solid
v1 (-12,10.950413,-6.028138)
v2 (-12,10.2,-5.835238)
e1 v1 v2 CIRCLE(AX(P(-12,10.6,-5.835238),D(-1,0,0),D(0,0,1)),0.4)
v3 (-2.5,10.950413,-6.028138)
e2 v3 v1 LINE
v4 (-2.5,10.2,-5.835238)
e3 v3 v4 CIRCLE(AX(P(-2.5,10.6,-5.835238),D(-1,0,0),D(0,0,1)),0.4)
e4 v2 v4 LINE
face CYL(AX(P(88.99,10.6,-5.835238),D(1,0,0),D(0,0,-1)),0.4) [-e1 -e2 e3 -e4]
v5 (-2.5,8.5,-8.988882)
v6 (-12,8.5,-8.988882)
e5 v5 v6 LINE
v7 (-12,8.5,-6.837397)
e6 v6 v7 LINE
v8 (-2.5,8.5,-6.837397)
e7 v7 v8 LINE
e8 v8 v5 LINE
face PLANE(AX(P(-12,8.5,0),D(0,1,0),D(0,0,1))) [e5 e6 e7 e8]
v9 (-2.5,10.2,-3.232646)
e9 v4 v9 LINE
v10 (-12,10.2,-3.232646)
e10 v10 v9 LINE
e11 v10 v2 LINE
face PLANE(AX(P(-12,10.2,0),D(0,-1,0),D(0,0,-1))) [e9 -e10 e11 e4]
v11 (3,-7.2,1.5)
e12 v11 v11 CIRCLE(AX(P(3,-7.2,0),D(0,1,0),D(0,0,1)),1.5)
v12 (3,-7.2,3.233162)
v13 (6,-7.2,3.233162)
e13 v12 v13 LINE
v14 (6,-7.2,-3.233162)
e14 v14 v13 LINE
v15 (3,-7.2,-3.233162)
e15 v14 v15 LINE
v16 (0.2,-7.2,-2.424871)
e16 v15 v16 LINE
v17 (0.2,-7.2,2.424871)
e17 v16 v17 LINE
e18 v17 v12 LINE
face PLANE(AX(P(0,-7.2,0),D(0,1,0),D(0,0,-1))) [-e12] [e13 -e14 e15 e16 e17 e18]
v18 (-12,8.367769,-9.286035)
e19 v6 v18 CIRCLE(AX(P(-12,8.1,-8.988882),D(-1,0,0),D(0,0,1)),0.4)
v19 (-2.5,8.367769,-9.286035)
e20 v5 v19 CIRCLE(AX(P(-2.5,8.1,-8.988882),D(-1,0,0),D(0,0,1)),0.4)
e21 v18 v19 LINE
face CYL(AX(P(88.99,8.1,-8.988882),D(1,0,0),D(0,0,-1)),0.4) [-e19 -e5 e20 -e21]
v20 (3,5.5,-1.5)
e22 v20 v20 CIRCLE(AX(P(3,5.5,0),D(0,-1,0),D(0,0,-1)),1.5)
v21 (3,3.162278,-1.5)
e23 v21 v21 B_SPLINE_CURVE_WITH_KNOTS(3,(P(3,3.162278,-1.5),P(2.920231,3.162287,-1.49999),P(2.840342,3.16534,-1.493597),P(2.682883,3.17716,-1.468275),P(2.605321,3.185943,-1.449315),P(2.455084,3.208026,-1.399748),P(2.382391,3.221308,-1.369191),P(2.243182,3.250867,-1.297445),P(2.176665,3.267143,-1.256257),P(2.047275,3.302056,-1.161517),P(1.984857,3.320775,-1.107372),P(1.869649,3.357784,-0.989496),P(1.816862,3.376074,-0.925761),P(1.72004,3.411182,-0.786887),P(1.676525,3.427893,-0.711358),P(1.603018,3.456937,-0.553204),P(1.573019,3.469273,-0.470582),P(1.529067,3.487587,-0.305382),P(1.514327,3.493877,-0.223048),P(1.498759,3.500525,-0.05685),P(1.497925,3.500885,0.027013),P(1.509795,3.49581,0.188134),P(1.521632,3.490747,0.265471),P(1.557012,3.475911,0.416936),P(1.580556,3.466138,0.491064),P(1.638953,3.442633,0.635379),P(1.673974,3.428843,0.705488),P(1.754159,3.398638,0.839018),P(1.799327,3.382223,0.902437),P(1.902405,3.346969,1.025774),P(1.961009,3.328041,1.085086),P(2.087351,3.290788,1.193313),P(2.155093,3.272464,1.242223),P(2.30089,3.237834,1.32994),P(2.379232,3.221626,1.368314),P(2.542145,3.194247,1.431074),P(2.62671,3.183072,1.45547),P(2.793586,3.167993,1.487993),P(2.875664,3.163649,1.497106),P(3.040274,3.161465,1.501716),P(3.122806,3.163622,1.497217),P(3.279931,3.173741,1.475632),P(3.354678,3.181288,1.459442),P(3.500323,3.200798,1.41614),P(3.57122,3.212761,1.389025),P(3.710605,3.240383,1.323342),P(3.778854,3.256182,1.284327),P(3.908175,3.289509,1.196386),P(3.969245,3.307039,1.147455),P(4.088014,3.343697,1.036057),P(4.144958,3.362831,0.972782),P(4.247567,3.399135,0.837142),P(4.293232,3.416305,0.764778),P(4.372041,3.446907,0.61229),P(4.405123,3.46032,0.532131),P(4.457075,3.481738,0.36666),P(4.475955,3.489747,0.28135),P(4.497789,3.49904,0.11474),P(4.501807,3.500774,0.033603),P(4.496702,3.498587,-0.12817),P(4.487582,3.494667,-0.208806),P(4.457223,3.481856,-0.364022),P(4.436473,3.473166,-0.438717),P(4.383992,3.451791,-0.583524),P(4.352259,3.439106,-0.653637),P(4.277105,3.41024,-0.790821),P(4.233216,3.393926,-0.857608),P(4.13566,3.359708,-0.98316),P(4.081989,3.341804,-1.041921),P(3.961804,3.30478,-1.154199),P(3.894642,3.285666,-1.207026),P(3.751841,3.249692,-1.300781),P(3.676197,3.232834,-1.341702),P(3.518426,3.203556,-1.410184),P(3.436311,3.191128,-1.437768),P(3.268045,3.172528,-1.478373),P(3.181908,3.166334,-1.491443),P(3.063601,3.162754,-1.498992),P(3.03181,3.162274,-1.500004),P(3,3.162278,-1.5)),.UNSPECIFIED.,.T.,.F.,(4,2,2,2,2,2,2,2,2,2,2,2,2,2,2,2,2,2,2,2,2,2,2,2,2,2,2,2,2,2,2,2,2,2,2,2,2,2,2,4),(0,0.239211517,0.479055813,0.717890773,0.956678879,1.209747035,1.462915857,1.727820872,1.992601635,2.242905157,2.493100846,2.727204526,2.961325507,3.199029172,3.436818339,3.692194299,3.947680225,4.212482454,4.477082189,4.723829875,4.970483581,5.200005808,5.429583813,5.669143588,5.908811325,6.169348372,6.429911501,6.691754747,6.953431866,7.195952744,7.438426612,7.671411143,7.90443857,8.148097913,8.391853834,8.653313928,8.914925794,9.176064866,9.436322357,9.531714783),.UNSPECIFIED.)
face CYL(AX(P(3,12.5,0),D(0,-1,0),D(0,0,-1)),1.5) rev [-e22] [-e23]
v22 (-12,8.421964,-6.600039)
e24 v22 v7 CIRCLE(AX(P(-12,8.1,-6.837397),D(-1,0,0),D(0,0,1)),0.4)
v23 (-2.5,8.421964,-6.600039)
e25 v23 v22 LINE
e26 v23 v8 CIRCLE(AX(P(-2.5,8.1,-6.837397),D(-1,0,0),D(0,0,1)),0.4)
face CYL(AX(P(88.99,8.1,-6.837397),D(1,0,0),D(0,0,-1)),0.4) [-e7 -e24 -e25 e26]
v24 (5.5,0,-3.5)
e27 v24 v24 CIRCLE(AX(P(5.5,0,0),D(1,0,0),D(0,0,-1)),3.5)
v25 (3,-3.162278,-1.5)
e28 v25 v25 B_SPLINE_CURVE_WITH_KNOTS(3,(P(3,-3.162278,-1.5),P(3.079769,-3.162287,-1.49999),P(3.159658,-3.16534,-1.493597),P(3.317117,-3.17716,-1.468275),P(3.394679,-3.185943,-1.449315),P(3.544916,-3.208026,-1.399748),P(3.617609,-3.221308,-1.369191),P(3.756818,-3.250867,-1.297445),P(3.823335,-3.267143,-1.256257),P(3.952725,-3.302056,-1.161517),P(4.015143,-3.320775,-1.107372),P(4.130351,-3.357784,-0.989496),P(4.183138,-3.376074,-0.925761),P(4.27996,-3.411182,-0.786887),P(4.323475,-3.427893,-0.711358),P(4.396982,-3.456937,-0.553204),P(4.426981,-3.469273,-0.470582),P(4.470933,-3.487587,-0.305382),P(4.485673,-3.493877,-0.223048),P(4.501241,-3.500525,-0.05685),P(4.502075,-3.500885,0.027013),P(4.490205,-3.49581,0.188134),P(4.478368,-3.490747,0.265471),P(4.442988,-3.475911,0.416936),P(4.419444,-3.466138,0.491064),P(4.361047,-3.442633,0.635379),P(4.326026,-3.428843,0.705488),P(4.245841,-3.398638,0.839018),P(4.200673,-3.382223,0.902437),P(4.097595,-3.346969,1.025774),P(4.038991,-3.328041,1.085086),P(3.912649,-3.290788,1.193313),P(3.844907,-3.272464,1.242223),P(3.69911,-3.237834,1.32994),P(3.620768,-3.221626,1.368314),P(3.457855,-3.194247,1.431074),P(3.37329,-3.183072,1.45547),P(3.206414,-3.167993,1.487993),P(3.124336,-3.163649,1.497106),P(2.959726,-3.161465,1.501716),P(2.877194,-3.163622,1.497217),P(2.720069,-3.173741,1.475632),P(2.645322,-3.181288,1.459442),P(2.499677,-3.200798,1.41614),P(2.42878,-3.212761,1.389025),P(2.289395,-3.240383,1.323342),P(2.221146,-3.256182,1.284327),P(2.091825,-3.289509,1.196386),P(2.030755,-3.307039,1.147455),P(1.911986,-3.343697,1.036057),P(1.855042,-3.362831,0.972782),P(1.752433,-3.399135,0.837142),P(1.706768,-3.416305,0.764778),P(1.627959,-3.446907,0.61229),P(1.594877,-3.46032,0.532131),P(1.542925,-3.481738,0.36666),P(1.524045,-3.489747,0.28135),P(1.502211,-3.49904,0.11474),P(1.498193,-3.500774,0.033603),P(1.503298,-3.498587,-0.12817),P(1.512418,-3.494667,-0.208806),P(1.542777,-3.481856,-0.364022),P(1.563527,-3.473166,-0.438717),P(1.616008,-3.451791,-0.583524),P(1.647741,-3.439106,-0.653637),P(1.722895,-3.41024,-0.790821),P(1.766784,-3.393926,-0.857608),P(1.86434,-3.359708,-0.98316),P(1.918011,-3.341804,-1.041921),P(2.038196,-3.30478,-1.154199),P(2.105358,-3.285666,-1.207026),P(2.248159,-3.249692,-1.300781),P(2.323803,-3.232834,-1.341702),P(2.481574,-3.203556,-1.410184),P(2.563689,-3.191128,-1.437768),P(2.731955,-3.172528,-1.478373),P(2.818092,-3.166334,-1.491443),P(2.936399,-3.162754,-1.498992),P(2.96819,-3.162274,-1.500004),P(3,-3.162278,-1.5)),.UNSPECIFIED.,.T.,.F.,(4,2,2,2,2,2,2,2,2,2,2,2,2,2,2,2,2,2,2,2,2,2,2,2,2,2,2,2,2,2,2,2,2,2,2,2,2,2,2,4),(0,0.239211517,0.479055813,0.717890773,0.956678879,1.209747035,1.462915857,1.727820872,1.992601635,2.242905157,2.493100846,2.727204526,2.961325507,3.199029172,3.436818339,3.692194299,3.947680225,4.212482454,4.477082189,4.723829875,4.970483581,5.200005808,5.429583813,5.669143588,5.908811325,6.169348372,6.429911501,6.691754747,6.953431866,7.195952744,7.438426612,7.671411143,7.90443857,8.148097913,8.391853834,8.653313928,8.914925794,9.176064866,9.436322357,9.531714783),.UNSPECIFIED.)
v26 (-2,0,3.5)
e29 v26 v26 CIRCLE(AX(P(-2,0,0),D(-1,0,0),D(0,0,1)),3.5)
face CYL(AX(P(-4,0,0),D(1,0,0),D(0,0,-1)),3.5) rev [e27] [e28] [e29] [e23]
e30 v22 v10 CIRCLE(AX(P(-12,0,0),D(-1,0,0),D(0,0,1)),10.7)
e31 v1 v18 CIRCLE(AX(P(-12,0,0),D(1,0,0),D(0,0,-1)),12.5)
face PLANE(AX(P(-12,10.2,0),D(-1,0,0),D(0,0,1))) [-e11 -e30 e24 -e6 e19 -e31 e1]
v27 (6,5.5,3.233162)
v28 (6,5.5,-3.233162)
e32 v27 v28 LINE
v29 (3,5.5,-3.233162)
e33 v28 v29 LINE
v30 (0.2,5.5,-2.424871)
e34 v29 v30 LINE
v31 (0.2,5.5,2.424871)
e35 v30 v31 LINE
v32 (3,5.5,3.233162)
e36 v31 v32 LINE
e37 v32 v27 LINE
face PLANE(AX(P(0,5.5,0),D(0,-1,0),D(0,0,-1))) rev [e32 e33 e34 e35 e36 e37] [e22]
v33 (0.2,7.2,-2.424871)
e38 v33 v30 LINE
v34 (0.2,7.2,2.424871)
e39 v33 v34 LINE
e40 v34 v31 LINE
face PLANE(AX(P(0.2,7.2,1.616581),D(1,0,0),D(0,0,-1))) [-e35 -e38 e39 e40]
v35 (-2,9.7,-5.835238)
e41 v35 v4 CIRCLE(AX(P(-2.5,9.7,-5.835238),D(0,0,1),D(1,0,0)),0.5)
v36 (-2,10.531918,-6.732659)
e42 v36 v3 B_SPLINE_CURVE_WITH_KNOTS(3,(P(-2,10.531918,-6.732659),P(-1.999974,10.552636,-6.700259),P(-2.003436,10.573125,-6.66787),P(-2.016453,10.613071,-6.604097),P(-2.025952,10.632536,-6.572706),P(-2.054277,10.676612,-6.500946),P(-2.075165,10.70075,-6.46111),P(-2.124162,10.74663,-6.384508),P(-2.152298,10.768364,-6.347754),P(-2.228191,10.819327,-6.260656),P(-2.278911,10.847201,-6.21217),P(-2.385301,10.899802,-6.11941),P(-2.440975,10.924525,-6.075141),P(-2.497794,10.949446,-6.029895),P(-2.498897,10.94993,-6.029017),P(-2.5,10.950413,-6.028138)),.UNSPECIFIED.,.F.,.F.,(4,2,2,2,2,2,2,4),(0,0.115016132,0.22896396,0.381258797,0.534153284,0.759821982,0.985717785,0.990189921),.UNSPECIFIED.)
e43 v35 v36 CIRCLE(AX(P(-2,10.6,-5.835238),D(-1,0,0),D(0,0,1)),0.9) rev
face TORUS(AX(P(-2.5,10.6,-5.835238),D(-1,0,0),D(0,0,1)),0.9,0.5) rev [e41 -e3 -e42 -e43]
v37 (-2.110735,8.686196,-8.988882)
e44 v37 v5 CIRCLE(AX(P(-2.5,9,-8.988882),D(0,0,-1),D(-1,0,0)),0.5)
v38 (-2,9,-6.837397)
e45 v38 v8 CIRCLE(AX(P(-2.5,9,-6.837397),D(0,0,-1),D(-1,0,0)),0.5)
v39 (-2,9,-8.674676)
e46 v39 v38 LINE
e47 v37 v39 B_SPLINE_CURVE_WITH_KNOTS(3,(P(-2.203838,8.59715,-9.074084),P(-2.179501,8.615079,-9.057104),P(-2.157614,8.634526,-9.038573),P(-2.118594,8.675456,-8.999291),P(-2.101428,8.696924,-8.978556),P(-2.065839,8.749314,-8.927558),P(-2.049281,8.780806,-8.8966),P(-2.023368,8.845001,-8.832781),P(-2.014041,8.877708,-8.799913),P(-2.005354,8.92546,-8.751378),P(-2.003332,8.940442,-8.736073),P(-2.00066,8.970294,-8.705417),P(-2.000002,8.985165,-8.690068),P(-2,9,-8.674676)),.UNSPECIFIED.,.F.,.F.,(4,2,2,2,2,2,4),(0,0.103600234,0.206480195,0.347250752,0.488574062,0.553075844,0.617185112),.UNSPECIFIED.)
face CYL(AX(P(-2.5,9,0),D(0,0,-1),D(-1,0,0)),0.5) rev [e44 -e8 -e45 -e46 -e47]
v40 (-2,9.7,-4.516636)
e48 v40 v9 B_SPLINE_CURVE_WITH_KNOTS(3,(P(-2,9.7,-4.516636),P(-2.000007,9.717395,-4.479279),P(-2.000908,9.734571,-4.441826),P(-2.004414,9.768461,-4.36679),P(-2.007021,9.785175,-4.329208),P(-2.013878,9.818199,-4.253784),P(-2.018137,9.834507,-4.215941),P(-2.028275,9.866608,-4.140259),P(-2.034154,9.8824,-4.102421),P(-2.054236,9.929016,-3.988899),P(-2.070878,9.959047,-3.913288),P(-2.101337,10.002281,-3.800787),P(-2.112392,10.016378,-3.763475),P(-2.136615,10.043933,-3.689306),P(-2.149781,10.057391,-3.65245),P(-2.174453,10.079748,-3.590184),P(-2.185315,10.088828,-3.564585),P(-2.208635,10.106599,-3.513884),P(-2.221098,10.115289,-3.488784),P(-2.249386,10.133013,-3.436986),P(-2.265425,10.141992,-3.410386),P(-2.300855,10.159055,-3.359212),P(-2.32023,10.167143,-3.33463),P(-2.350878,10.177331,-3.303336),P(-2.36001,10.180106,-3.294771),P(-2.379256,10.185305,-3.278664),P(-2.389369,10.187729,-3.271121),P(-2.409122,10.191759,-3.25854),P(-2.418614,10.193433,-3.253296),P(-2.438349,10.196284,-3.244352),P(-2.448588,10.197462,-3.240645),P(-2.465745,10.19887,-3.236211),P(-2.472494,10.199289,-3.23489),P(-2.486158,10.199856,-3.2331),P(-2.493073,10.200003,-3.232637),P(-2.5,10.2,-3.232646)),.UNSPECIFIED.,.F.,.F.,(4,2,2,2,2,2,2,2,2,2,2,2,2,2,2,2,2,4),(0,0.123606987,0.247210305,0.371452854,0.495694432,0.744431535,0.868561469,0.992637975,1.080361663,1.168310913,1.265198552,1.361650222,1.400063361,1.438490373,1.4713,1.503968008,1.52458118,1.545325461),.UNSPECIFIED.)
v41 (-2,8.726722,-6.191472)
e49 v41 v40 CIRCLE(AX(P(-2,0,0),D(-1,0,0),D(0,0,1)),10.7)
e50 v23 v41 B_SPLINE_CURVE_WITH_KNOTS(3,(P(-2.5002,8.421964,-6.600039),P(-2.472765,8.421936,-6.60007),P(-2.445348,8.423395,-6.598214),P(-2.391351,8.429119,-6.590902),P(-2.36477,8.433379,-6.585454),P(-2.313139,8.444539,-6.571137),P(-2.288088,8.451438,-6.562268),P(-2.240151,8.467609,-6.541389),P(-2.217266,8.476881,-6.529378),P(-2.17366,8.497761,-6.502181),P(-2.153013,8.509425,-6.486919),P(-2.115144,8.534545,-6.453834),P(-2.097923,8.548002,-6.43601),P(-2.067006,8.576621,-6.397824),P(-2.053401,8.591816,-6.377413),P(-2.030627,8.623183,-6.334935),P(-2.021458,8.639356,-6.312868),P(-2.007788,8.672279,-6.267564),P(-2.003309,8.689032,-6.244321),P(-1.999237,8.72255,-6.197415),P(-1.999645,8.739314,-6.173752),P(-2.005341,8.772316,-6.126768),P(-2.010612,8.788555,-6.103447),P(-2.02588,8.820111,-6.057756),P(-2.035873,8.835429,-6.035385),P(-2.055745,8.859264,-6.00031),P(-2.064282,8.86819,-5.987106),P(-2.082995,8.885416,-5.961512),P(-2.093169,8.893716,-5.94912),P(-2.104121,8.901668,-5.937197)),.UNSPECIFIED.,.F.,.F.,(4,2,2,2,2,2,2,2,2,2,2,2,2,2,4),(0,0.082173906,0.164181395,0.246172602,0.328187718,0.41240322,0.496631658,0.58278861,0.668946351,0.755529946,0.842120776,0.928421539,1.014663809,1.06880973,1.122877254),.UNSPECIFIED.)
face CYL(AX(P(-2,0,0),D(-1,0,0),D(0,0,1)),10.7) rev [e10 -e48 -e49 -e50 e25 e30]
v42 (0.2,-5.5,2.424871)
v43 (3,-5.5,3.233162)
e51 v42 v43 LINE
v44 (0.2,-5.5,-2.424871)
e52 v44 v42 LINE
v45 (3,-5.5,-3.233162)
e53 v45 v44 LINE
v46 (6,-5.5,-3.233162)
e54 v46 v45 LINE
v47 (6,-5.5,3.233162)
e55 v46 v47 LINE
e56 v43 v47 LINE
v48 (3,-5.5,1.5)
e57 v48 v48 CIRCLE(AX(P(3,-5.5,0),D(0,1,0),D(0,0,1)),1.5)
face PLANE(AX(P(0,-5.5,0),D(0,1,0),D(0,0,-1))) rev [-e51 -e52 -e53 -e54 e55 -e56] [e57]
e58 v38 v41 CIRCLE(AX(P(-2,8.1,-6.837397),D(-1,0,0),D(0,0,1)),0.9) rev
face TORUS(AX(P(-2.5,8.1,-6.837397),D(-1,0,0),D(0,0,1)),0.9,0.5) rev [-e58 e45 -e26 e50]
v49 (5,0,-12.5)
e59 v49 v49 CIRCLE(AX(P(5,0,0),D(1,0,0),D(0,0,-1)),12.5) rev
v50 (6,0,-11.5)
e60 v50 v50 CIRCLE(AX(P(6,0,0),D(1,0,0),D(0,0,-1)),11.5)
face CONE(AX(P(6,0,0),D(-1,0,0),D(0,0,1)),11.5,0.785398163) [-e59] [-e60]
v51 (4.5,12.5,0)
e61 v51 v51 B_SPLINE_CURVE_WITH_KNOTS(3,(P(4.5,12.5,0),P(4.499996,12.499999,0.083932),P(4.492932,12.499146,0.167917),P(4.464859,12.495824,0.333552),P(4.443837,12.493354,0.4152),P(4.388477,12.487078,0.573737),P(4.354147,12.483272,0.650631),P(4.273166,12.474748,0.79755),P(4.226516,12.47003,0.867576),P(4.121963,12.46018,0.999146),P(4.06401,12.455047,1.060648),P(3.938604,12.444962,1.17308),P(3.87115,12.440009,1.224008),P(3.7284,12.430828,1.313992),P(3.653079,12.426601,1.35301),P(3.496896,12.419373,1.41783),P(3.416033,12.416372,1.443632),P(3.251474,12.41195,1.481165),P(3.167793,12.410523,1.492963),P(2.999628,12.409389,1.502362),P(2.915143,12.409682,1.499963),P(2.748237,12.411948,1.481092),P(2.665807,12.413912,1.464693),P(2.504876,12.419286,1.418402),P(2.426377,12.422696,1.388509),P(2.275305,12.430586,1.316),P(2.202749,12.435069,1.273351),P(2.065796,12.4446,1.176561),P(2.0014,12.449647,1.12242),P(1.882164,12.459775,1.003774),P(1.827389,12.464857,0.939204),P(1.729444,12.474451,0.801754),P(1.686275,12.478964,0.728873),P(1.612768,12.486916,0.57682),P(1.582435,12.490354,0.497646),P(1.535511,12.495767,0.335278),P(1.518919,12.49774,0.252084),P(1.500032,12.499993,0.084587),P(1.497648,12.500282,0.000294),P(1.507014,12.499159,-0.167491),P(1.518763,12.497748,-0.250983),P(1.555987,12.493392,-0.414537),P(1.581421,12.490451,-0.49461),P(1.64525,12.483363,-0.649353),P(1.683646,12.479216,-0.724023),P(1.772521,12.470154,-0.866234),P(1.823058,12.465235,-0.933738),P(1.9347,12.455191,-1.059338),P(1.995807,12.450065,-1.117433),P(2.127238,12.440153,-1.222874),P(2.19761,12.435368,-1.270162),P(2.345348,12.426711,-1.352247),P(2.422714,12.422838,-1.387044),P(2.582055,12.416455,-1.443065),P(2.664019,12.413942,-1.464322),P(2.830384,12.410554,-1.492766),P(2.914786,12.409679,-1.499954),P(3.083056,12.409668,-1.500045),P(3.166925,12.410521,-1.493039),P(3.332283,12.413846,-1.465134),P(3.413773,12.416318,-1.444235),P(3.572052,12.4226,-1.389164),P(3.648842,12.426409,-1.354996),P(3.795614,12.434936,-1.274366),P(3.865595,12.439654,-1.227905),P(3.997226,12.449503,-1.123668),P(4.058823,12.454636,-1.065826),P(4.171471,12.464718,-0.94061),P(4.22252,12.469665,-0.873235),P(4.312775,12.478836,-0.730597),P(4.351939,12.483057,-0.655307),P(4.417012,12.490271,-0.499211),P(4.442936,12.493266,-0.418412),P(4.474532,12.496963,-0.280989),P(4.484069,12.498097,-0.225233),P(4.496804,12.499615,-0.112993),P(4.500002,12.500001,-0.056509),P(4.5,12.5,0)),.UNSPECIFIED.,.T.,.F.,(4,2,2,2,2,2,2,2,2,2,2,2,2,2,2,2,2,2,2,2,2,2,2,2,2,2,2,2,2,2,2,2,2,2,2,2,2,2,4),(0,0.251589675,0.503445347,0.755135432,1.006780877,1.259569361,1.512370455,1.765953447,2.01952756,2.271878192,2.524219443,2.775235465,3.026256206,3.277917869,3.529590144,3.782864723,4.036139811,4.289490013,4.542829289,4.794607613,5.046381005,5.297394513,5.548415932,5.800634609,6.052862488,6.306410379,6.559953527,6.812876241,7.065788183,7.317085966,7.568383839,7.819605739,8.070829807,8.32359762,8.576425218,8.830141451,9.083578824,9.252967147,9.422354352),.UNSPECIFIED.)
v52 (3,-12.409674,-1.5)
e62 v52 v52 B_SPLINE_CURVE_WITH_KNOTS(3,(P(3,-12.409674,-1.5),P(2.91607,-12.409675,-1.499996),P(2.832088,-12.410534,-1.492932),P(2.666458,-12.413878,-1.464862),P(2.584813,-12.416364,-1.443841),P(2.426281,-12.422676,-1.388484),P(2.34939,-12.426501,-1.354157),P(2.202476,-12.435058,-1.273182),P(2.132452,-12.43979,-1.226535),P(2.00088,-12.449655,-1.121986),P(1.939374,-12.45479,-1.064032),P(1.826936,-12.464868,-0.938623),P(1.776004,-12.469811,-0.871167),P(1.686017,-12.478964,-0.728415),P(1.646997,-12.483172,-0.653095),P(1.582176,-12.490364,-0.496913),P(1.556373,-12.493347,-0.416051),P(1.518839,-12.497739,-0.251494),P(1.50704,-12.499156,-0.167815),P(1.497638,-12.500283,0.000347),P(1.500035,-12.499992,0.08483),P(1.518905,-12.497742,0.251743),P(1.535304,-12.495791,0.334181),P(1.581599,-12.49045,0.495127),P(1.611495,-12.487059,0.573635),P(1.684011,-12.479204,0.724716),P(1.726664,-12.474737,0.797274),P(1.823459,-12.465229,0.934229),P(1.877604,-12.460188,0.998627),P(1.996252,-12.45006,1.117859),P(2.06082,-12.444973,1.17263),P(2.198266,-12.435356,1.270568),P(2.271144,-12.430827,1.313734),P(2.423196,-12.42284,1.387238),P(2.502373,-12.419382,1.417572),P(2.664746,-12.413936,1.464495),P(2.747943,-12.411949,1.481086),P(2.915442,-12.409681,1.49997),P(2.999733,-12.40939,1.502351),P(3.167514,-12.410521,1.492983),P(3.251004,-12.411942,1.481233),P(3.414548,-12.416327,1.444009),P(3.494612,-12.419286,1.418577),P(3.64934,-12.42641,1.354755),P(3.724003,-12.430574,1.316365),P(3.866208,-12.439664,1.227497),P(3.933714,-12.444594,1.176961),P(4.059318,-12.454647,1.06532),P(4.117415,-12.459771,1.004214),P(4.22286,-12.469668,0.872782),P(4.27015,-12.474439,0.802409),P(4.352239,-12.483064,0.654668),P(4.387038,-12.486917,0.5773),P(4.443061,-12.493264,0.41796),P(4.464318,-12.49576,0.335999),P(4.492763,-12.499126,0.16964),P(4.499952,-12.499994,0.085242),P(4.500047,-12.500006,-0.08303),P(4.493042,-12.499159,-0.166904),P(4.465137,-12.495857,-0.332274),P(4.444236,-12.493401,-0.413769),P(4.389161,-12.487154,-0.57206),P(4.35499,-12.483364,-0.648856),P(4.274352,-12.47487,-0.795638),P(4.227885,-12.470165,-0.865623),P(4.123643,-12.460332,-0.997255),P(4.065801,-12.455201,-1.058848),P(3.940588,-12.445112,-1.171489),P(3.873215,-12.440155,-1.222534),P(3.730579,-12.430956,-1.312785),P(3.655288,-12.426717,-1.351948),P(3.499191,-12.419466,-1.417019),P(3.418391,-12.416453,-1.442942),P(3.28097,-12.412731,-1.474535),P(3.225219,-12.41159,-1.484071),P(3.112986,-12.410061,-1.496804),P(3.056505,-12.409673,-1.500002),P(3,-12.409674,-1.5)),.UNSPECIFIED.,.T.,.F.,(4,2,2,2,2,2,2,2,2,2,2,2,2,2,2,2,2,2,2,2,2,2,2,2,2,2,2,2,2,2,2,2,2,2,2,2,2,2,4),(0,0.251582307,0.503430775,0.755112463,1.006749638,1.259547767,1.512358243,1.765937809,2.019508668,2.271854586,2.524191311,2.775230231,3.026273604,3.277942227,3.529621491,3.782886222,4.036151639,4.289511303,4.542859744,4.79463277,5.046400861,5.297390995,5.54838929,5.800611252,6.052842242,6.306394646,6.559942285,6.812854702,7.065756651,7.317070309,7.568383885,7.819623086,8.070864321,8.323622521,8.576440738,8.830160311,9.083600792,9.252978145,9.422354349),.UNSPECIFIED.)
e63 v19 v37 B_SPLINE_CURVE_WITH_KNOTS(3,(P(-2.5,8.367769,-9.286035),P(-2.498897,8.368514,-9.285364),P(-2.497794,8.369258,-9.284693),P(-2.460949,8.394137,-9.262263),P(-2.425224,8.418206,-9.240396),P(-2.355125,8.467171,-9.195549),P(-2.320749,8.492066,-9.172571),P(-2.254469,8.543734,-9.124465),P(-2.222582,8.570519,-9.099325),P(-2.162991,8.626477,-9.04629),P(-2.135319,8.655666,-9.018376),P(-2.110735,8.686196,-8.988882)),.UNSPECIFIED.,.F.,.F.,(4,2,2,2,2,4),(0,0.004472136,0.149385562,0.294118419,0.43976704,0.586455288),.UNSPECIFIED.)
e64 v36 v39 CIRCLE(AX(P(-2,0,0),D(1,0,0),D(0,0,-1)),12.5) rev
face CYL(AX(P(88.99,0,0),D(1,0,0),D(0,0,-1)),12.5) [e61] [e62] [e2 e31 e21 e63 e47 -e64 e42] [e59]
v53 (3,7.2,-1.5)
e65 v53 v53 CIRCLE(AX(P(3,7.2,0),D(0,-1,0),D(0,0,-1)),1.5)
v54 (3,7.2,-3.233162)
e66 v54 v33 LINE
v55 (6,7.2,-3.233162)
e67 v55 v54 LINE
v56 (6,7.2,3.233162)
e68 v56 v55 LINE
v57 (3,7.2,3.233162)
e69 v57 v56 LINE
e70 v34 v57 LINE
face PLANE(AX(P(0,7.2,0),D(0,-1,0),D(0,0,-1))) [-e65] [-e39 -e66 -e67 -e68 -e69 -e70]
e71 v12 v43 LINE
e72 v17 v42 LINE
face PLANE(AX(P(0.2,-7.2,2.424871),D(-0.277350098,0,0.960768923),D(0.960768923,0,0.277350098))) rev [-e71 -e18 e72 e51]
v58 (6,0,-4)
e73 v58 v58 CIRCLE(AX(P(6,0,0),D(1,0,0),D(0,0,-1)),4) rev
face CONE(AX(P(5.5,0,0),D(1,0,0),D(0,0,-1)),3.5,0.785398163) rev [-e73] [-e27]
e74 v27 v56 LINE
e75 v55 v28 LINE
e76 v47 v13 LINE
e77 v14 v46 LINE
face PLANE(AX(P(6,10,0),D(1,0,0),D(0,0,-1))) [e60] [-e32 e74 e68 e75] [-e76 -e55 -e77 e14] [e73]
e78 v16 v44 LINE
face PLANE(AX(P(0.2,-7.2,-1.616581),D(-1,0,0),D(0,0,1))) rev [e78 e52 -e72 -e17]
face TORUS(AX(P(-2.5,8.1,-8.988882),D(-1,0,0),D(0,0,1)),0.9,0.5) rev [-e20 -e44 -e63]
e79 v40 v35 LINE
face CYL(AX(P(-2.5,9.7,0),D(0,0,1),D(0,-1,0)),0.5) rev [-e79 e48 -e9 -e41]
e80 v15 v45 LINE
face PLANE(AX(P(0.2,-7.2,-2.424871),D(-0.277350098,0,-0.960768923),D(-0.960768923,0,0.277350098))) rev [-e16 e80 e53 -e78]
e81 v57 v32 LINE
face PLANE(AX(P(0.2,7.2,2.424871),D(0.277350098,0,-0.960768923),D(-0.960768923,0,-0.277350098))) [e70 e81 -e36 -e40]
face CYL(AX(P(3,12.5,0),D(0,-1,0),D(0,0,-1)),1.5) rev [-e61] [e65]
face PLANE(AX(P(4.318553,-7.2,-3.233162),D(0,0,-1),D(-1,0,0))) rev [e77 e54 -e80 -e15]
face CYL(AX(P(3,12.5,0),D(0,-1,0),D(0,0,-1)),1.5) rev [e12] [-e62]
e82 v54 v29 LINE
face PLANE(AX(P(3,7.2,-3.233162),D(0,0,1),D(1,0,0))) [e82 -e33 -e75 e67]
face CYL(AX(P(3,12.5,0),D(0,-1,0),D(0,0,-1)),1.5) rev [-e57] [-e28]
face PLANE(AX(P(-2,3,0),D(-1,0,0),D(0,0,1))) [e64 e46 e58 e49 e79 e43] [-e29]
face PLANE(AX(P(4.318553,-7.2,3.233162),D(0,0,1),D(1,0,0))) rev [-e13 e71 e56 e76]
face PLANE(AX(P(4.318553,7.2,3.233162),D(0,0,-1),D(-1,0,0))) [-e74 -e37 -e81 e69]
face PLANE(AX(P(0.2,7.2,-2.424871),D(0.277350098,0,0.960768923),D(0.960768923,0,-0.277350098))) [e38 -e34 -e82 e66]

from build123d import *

# Parameters (mm, degrees)
CUT_EXTRUDE1_DEPTH       = 22.365860619
CUT_EXTRUDE1_DEPTH_BACK  = 22.365860619
SKETCH2_R                = 1.5
SKETCH3_W                = 9.16515139
SKETCH3_H                = 1.7
CUT_EXTRUDE2_DEPTH       = 21.310096204
FILLET1_R                = 0.4
BOSS_EXTRUDE1_START      = 19.2405
SKETCH4_R                = 6.5
SKETCH4_R_2              = 3
BOSS_EXTRUDE1_DEPTH      = 19.2405
CHAMFER1_SIZE            = 1.5
CHAMFER2_SIZE            = 0.5
FILLET2_R                = 0.5
CUT_EXTRUDE3_START       = -19.2405
CUT_EXTRUDE3_OUTLINE_R   = 7.963373885
CUT_EXTRUDE3_OUTLINE_R_2 = 3
CUT_EXTRUDE3_DEPTH       = 19.2405
SKETCH6_R                = 3.5
CUT_EXTRUDE4_DEPTH       = 10
CHAMFER3_SIZE            = 0.5
SKETCH7_R                = 10.7
CUT_EXTRUDE5_DEPTH       = 10
CUT_EXTRUDE6_START       = 5.5
CUT_EXTRUDE6_DEPTH       = 1.7
CHAMFER5_SIZE            = 1


# Read off the part's stored shape, not the designer's step: Cut-Extrude3
with BuildPart() as part:
    # Sketch1 → Revolve1 (revolve)
    with BuildSketch(Plane.XY, mode=Mode.PRIVATE) as revolve1_sk:
        Polygon((-12, 12.5), (0, 12.5), (6, 12.5), (6, 10), (6, 3), (-2, 3), (-2, 10.2), (-12, 10.2), align=None)
    revolve(revolve1_sk.sketch.rotate(Axis((88.99, 0, 0), (-1, 0, 0)), 90), axis=Axis((88.99, 0, 0), (-1, 0, 0)))

    # Sketch2 → Cut-Extrude1 (cut, two sides: drawn at the far end of the back side and taken through both)
    with BuildSketch(Plane(origin=(0, 0, 0), x_dir=(1, 0, 0), z_dir=(0, 1, 0)).offset(-CUT_EXTRUDE1_DEPTH_BACK)):
        with Locations(Location((3, 0, 0), (0, 0, 90))):
            Circle(SKETCH2_R)
    extrude(amount=CUT_EXTRUDE1_DEPTH + CUT_EXTRUDE1_DEPTH_BACK, mode=Mode.SUBTRACT)

    # Sketch3 → Cut-Extrude2 (cut, through all)
    with BuildSketch(Plane.ZY.offset(2)):
        with Locations((-4.582575695, 9.35)):
            Rectangle(SKETCH3_W, SKETCH3_H)
    extrude(amount=CUT_EXTRUDE2_DEPTH, mode=Mode.SUBTRACT)

    # Fillet1
    fillet1_edges = [part.edges().sort_by_distance(p)[0] for p in [
        (-7, 8.5, -5.638262144),
        (-7, 10.2, -7.22564876),
        (-7, 8.5, -9.16515139),
    ]]
    fillet(fillet1_edges, radius=FILLET1_R)

    # Sketch4 → Boss-Extrude1 (add)
    with BuildSketch(Plane.ZY.offset(2).offset(BOSS_EXTRUDE1_START)):
        Circle(SKETCH4_R)
        with Locations(Location((0, 0, 0), (0, 0, 180))):
            Circle(SKETCH4_R_2, mode=Mode.SUBTRACT)
    extrude(amount=-BOSS_EXTRUDE1_DEPTH)

    # Chamfer1
    chamfer1_edges = [part.edges().sort_by_distance(p)[0] for p in [
        (-21.2405, 0, -6.5),
        (-21.2405, 0, 3),
    ]]
    chamfer(chamfer1_edges, length=CHAMFER1_SIZE)

    # Chamfer2
    chamfer2_edges = [part.edges().sort_by_distance(p)[0] for p in [
        (6, 0, 3),
    ]]
    chamfer(chamfer2_edges, length=CHAMFER2_SIZE)

    # Fillet2
    # the kernel refuses this fillet: 0.5 mm, written as the material it adds along each edge
    with BuildSketch(Plane(origin=(-2, 0, 0), x_dir=(0, 0.7641509433962261, -0.6450374684517619), z_dir=(0, 0.6450374684517619, 0.7641509433962261))) as fillet2_piece_1:
        with BuildLine():
            CenterArc((10.2 - FILLET2_R, FILLET2_R), FILLET2_R, 270, 90)
            Line((10.2, FILLET2_R), (10.2, 0))
            Line((10.2, 0), (10.2 - FILLET2_R, 0))
        make_face()
    revolve(axis=Axis((-2, 0, 0), (-1, 0, 0)), revolution_arc=319.831515217)
    with BuildSketch(Plane(origin=(-2, 10.2, 0), x_dir=(0, -1, 0), z_dir=(0, 0, -1))) as fillet2_piece_2:
        with BuildLine():
            CenterArc((FILLET2_R, FILLET2_R), FILLET2_R, 180, 90)
            Line((0, FILLET2_R), (0, 0))
            Line((0, 0), (FILLET2_R, 0))
        make_face()
    extrude(amount=5.835237784)
    with BuildSketch(Plane(origin=(-2, 8.5, -8.988882022), x_dir=(0, 1, 0), z_dir=(0, 0, 1))) as fillet2_piece_3_section:
        with BuildLine():
            CenterArc((FILLET2_R, FILLET2_R), FILLET2_R, 180, 90)
            Line((0, FILLET2_R), (0, 0))
            Line((0, 0), (FILLET2_R, 0))
        make_face()
    fillet2_piece_3 = extrude(amount=2.151484856, mode=Mode.PRIVATE)
    fillet2_piece_3 = fillet2_piece_3 & Plane(origin=(-2.112337318, 0, 0), x_dir=(0, 0, -1), z_dir=(1, 0, 0)) * Cylinder(12.5, 7, mode=Mode.PRIVATE)
    add(fillet2_piece_3)
    with BuildSketch(Plane(origin=(-2, 8.1, -6.837397166), x_dir=(0, -0.7641509433962268, 0.6450374684517612), z_dir=(0, -0.6450374684517612, -0.7641509433962268))) as fillet2_piece_4:
        with BuildLine():
            CenterArc((0.4 + FILLET2_R, FILLET2_R), FILLET2_R, 180, 90)
            Line((0.4, FILLET2_R), (0.4, 0))
            Line((0.4, 0), (0.4 + FILLET2_R, 0))
        make_face()
    revolve(axis=Axis((-2, 8.1, -6.837397166), (-1, 0, 0)), revolution_arc=139.831515217)
    with BuildSketch(Plane(origin=(-2, 8.1, -8.988882022), x_dir=(0, -0.6813941617388248, 0.7319166594280009), z_dir=(0, 0.7319166594280009, 0.6813941617388248))) as fillet2_piece_5_section:
        with BuildLine():
            CenterArc((0.4 + FILLET2_R, -FILLET2_R), FILLET2_R, 90, 90)
            Line((0.4, -FILLET2_R), (0.4, 0))
            Line((0.4, 0), (0.4 + FILLET2_R, 0))
        make_face()
    fillet2_piece_5 = revolve(axis=Axis((-2, 8.1, -8.988882022), (1, 0, 0)), revolution_arc=227.047315948, mode=Mode.PRIVATE)
    fillet2_piece_5 = fillet2_piece_5 & Plane(origin=(-2.20433756, 0, 0), x_dir=(0, 0, -1), z_dir=(1, 0, 0)) * Cylinder(12.5, 4, mode=Mode.PRIVATE)
    add(fillet2_piece_5)
    with BuildSketch(Plane(origin=(-2, 10.6, -5.835237784), x_dir=(0, -0.8696656127523182, 0.49364128878785535), z_dir=(0, -0.49364128878785535, -0.8696656127523182))) as fillet2_piece_6_section:
        with BuildLine():
            CenterArc((0.4 + FILLET2_R, FILLET2_R), FILLET2_R, 180, 90)
            Line((0.4 + FILLET2_R, 0), (0.4, 0))
            Line((0.4, 0), (0.4, FILLET2_R))
        make_face()
    fillet2_piece_6 = revolve(axis=Axis((-2, 10.6, -5.835237784), (-1, 0, 0)), revolution_arc=330.419804772, mode=Mode.PRIVATE)
    fillet2_piece_6 = fillet2_piece_6 & Plane(origin=(-2.048284791, 0, 0), x_dir=(0, 0, -1), z_dir=(1, 0, 0)) * Cylinder(12.5, 4, mode=Mode.PRIVATE)
    add(fillet2_piece_6)
    with BuildSketch(Plane(origin=(-2, 0, 0), x_dir=(0, 0, 1), z_dir=(0, -1, 0))) as fillet2_piece_7:
        with BuildLine():
            CenterArc((6.5 + FILLET2_R, FILLET2_R), FILLET2_R, 180, 90)
            Line((6.5, FILLET2_R), (6.5, 0))
            Line((6.5, 0), (6.5 + FILLET2_R, 0))
        make_face()
    revolve(axis=Axis((-2, 0, 0), (-1, 0, 0)))

    # Cut-Extrude3 outline → Cut-Extrude3 (cut)
    with BuildSketch(Plane.ZY.offset(21.2405).offset(CUT_EXTRUDE3_START)):
        Circle(CUT_EXTRUDE3_OUTLINE_R)
        Circle(CUT_EXTRUDE3_OUTLINE_R_2, mode=Mode.SUBTRACT)
    extrude(amount=CUT_EXTRUDE3_DEPTH, mode=Mode.SUBTRACT)

    # Sketch6 → Cut-Extrude4 (cut)
    with BuildSketch(Plane(origin=(6, 0, 0), x_dir=(0, 0, -1), z_dir=(1, 0, 0))):
        Circle(SKETCH6_R)
    extrude(amount=-CUT_EXTRUDE4_DEPTH, mode=Mode.SUBTRACT)

    # Chamfer3
    chamfer3_edges = [part.edges().sort_by_distance(p)[0] for p in [
        (6, 0, 3.5),
    ]]
    chamfer(chamfer3_edges, length=CHAMFER3_SIZE)

    # Sketch7 → Cut-Extrude5 (cut)
    with BuildSketch(Plane.ZY.offset(12)):
        Circle(SKETCH7_R)
    extrude(amount=-CUT_EXTRUDE5_DEPTH, mode=Mode.SUBTRACT)

    # Sketch8 → Cut-Extrude6 (cut)
    with BuildSketch(Plane(origin=(0, 0, 0), x_dir=(1, 0, 0), z_dir=(0, 1, 0)).offset(CUT_EXTRUDE6_START)):
        Polygon((0.2, 1.616580754), (0.2, -1.616580754), (0.2, -2.424871131), (3, -3.233161507), (4.318553482, -3.233161507), (8.377038533, -3.233161507), (8.377038533, 3.233161507), (4.318553482, 3.233161507), (3, 3.233161507), (0.2, 2.424871131), align=None)
    cut_extrude6 = extrude(amount=CUT_EXTRUDE6_DEPTH, mode=Mode.SUBTRACT)

    # Chamfer5
    chamfer5_edges = [part.edges().sort_by_distance(p)[0] for p in [
        (6, 0, 12.5),
    ]]
    chamfer(chamfer5_edges, length=CHAMFER5_SIZE)

    # Mirror1: Cut-Extrude6 across plane
    add(cut_extrude6.mirror(Plane.ZX), mode=Mode.SUBTRACT)


solid = part.part
